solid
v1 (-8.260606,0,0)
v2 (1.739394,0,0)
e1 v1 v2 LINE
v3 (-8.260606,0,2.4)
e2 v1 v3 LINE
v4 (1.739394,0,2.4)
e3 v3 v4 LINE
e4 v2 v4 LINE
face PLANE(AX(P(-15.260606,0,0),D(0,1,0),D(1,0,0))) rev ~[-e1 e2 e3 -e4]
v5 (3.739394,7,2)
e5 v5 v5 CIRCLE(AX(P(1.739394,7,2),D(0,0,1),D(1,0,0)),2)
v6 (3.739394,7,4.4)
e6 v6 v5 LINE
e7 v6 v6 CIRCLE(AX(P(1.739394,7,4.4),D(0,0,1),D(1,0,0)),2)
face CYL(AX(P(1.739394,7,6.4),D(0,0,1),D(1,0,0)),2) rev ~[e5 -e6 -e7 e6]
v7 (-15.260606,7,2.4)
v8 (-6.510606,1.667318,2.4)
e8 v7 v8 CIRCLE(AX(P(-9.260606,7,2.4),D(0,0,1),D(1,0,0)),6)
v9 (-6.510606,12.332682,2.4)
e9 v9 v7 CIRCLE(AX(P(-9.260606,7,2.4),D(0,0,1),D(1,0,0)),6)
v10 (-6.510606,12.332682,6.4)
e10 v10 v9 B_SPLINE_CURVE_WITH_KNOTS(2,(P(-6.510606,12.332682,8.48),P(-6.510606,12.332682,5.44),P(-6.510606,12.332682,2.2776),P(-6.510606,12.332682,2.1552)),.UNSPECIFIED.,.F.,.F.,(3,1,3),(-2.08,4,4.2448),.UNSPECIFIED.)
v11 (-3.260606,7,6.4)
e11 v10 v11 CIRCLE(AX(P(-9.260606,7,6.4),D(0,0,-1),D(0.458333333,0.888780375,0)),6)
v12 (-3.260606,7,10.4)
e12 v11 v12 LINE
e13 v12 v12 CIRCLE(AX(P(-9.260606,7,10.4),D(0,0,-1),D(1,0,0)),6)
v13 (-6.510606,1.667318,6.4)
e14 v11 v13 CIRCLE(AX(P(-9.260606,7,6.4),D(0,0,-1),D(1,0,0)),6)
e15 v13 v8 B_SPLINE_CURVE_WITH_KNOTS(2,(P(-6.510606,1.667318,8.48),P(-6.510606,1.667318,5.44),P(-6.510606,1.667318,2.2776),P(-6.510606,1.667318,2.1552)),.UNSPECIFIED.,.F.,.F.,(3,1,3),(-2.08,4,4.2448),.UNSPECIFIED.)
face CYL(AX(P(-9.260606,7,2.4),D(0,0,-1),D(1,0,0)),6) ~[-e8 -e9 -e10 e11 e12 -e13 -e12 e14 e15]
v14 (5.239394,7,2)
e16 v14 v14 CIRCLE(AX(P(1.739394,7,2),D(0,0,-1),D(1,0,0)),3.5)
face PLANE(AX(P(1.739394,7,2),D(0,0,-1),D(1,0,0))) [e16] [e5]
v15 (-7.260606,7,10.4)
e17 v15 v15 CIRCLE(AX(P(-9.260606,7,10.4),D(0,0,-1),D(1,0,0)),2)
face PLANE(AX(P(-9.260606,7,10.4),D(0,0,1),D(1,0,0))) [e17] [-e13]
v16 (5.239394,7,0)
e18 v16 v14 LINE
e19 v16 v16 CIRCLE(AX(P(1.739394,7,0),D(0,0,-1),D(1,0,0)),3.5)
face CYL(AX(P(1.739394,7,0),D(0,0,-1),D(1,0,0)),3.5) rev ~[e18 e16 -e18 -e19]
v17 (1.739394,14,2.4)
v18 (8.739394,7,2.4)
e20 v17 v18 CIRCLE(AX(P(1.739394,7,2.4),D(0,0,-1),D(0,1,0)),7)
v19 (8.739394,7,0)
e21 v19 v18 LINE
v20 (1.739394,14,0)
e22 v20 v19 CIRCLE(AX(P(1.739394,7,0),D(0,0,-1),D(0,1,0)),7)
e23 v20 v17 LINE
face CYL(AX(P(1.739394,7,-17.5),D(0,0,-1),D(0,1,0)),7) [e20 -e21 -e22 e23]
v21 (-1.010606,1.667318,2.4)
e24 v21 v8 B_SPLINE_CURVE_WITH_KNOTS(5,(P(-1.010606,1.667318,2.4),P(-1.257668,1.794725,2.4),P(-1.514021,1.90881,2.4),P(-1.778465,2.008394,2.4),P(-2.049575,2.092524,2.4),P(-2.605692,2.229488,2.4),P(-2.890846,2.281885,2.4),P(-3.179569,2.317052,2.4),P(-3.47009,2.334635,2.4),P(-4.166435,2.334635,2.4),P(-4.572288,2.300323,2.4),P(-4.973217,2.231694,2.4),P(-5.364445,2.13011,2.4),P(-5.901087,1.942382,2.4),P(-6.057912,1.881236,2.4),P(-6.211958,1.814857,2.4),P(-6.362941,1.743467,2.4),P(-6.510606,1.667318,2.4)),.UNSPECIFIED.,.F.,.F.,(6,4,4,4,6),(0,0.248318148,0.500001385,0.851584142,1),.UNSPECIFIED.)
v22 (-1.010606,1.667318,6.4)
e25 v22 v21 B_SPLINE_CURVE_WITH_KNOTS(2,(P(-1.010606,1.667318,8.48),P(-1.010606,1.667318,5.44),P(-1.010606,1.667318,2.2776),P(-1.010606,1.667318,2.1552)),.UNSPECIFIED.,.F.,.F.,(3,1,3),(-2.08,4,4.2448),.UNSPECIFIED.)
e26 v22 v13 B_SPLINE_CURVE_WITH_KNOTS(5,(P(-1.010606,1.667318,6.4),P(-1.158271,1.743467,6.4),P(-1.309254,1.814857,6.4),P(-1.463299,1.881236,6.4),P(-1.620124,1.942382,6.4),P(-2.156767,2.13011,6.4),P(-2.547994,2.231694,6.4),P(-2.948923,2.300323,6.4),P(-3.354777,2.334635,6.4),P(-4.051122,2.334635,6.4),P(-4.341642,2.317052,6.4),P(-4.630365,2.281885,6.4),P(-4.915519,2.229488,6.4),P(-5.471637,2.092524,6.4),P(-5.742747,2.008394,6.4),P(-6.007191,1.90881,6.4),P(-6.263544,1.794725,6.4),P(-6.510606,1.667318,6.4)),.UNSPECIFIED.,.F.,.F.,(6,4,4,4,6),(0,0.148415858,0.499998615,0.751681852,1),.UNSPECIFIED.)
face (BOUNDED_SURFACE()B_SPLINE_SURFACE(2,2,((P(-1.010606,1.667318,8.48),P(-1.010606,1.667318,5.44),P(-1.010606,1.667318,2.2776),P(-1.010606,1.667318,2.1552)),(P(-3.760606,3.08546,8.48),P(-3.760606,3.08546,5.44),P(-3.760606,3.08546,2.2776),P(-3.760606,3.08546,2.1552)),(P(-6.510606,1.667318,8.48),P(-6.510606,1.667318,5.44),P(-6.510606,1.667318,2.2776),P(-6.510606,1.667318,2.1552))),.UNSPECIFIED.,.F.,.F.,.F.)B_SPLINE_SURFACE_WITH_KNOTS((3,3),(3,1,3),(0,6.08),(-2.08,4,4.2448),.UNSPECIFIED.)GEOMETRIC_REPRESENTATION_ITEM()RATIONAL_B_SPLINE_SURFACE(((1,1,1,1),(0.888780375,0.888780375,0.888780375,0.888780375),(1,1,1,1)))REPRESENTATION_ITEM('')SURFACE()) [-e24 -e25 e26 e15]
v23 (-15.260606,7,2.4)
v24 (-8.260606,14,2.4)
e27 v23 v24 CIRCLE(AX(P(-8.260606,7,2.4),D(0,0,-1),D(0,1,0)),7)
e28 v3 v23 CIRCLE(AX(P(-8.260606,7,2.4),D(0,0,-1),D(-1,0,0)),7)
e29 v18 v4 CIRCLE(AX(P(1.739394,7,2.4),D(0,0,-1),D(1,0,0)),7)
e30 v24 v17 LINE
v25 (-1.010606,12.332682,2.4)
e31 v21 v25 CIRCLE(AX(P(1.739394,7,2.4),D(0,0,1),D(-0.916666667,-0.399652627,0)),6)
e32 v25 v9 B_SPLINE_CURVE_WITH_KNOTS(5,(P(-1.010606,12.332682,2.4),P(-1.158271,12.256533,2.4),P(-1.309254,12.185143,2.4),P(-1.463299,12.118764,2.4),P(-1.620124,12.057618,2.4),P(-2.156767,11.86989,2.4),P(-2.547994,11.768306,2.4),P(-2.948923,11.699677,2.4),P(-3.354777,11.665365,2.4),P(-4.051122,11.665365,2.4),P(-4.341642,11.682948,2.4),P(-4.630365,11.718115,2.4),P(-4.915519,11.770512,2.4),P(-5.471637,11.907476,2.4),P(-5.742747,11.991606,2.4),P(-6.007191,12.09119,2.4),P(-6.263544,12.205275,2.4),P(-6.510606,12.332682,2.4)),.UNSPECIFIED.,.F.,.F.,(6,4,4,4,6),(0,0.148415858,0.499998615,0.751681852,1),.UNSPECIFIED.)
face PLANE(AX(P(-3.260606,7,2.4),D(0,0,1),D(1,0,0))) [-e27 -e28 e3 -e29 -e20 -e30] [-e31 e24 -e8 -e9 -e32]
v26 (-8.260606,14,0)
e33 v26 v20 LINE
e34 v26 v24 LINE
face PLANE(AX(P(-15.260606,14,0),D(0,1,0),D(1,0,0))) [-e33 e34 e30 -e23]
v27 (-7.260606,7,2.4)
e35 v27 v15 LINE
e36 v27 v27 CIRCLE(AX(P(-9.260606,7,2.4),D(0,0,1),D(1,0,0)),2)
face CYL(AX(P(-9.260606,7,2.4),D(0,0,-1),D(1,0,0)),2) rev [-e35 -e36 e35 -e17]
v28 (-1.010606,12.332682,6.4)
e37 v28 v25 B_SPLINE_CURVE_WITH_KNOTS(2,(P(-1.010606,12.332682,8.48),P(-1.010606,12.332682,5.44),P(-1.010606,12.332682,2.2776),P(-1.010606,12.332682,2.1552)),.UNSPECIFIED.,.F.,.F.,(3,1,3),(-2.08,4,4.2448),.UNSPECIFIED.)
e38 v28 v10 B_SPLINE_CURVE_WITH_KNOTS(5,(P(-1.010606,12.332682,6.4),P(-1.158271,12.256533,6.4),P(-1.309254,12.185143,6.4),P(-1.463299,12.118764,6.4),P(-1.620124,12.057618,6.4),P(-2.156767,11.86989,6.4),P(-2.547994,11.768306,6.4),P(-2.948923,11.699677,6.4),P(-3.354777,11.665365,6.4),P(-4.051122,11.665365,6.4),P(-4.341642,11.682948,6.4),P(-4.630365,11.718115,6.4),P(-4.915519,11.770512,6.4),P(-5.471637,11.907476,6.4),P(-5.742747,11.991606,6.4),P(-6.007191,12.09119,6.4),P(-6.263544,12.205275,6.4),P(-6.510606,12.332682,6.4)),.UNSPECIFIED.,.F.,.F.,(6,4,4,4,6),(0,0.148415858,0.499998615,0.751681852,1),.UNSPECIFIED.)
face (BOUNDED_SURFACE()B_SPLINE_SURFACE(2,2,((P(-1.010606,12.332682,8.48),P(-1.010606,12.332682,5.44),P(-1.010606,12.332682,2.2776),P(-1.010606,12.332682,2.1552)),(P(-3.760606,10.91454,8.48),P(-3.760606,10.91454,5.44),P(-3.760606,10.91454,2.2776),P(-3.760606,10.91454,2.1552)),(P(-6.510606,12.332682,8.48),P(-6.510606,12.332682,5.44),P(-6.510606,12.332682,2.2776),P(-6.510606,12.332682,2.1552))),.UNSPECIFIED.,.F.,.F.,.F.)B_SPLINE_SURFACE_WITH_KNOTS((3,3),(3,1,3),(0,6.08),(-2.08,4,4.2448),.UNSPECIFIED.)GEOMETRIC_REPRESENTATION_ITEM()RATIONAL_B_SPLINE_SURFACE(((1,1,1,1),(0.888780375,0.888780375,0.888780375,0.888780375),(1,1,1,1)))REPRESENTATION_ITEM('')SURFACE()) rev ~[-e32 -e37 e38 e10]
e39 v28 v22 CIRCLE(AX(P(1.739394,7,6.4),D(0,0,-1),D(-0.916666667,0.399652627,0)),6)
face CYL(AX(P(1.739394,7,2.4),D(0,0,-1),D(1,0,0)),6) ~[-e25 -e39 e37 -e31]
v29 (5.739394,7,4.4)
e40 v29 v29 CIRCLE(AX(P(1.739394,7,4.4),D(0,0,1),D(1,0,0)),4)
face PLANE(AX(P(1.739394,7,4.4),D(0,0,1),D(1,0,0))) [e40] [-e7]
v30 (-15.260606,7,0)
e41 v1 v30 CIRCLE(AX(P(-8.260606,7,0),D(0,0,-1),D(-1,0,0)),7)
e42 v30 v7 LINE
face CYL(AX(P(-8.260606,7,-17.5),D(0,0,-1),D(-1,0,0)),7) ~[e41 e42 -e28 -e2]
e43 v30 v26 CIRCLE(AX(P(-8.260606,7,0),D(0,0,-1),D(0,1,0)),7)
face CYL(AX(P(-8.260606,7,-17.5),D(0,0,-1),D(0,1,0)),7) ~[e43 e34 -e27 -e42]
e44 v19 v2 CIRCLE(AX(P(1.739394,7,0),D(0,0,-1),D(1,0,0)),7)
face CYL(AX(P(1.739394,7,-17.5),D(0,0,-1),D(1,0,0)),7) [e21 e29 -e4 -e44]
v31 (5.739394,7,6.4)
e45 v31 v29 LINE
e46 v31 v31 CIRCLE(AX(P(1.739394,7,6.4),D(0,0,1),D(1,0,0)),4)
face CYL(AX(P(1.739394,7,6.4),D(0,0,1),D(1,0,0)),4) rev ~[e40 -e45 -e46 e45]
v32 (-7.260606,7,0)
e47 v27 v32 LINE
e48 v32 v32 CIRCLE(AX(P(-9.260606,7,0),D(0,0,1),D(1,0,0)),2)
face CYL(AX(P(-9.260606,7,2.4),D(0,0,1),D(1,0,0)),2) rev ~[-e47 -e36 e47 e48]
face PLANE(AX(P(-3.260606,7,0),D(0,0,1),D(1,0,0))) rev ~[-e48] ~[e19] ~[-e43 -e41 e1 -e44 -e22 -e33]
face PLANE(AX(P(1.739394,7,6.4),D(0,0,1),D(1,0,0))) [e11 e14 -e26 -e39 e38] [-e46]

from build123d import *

# Parameters (mm, degrees)
F0_W          = 24
F0_H          = 14
F1_DEPTH      = 2.4
F3_R          = 6
F4_DEPTH      = 8
F5_R          = 6
F6_DEPTH      = 4
F2_R          = 2
F7_DEPTH      = 2.401
F7_DEPTH_BACK = 8.001
F8_R          = 2
F9_DEPTH      = 6.401
F10_R         = 3.5
F11_DEPTH     = 2
F12_R         = 4
F13_DEPTH     = 2
F14_T1_DEPTH  = 37.4
F15_R         = 6


# Not quite as in the source:
# - a fillet or chamfer that OpenCascade refuses, or shapes differently, is made with other operations: its cross-section is extruded or revolved along the edge and cut away or added


with BuildPart() as f1:
    # F0 (on Top) → F1 (new body)
    with BuildSketch(Plane.XY):
        with Locations((-3.2606057666, 7)):
            Rectangle(F0_W, F0_H)
    extrude(amount=F1_DEPTH)

    # F3 (on face) → F4 (join)
    with BuildSketch(Plane.XY.offset(2.4)):
        with Locations((-9.2606057666, 7)):
            Circle(F3_R)
    extrude(amount=F4_DEPTH)

    # F5 (on face) → F6 (join)
    with BuildSketch(Plane.XY.offset(2.4)):
        with Locations((1.7393942334, 7)):
            Circle(F5_R)
    extrude(amount=F6_DEPTH)

    # F2 (on face) → F7 (cut, two sides)
    with BuildSketch(Plane.XY.offset(2.4)) as f7_sk:
        with Locations((-9.2606057666, 7)):
            Circle(F2_R)
    extrude(amount=-F7_DEPTH, mode=Mode.SUBTRACT)
    extrude(f7_sk.sketch, amount=F7_DEPTH_BACK, mode=Mode.SUBTRACT)

    # F8 (on face) → F9 (cut, through all)
    with BuildSketch(Plane.XY.offset(6.4)):
        with Locations((1.7393942334, 7)):
            Circle(F8_R)
    extrude(amount=-F9_DEPTH, mode=Mode.SUBTRACT)

    # F10 (on face) → F11 (cut)
    with BuildSketch(Plane(origin=(0, 0, 0), x_dir=(1, 0, 0), z_dir=(0, 0, -1))):
        with Locations((1.7393942334, -7)):
            Circle(F10_R)
    extrude(amount=-F11_DEPTH, mode=Mode.SUBTRACT)

    # F12 (on face) → F13 (cut)
    with BuildSketch(Plane.XY.offset(6.4)):
        with Locations((1.7393942334, 7)):
            Circle(F12_R)
    extrude(amount=-F13_DEPTH, mode=Mode.SUBTRACT)

    # F14: fillet of radius 7 on 4 edges, made by hand

    # F14_s2 → F14_t1 (cut)
    with BuildSketch(Plane.XY.offset(-17.5)):
        with BuildLine():
            ThreePointArc((-8.2606057666, 14), (-13.2103532349, 11.9497474683), (-15.2606057666, 7))
            Line((-15.2606057666, 7), (-15.2606057666, 14))
            Line((-15.2606057666, 14), (-8.2606057666, 14))
        make_face()
        with BuildLine():
            ThreePointArc((-15.2606057666, 7), (-13.2103532349, 2.0502525317), (-8.2606057666, 0))
            Line((-8.2606057666, 0), (-15.2606057666, 0))
            Line((-15.2606057666, 0), (-15.2606057666, 7))
        make_face()
        with BuildLine():
            ThreePointArc((8.7393942334, 7), (6.6891417017, 2.0502525317), (1.7393942334, 0))
            Line((1.7393942334, 0), (8.7393942334, 0))
            Line((8.7393942334, 0), (8.7393942334, 7))
        make_face()
        with BuildLine():
            ThreePointArc((1.7393942334, 14), (6.6891417017, 11.9497474683), (8.7393942334, 7))
            Line((8.7393942334, 7), (8.7393942334, 14))
            Line((8.7393942334, 14), (1.7393942334, 14))
        make_face()
    extrude(amount=F14_T1_DEPTH, mode=Mode.SUBTRACT)

    # F15
    f15_edges = [f1.edges().sort_by_distance(p)[0] for p in [
        (-3.760606, 4.602084, 4.4),
        (-3.760606, 9.397916, 4.4),
    ]]
    fillet(f15_edges, radius=F15_R)


solid = f1.part
